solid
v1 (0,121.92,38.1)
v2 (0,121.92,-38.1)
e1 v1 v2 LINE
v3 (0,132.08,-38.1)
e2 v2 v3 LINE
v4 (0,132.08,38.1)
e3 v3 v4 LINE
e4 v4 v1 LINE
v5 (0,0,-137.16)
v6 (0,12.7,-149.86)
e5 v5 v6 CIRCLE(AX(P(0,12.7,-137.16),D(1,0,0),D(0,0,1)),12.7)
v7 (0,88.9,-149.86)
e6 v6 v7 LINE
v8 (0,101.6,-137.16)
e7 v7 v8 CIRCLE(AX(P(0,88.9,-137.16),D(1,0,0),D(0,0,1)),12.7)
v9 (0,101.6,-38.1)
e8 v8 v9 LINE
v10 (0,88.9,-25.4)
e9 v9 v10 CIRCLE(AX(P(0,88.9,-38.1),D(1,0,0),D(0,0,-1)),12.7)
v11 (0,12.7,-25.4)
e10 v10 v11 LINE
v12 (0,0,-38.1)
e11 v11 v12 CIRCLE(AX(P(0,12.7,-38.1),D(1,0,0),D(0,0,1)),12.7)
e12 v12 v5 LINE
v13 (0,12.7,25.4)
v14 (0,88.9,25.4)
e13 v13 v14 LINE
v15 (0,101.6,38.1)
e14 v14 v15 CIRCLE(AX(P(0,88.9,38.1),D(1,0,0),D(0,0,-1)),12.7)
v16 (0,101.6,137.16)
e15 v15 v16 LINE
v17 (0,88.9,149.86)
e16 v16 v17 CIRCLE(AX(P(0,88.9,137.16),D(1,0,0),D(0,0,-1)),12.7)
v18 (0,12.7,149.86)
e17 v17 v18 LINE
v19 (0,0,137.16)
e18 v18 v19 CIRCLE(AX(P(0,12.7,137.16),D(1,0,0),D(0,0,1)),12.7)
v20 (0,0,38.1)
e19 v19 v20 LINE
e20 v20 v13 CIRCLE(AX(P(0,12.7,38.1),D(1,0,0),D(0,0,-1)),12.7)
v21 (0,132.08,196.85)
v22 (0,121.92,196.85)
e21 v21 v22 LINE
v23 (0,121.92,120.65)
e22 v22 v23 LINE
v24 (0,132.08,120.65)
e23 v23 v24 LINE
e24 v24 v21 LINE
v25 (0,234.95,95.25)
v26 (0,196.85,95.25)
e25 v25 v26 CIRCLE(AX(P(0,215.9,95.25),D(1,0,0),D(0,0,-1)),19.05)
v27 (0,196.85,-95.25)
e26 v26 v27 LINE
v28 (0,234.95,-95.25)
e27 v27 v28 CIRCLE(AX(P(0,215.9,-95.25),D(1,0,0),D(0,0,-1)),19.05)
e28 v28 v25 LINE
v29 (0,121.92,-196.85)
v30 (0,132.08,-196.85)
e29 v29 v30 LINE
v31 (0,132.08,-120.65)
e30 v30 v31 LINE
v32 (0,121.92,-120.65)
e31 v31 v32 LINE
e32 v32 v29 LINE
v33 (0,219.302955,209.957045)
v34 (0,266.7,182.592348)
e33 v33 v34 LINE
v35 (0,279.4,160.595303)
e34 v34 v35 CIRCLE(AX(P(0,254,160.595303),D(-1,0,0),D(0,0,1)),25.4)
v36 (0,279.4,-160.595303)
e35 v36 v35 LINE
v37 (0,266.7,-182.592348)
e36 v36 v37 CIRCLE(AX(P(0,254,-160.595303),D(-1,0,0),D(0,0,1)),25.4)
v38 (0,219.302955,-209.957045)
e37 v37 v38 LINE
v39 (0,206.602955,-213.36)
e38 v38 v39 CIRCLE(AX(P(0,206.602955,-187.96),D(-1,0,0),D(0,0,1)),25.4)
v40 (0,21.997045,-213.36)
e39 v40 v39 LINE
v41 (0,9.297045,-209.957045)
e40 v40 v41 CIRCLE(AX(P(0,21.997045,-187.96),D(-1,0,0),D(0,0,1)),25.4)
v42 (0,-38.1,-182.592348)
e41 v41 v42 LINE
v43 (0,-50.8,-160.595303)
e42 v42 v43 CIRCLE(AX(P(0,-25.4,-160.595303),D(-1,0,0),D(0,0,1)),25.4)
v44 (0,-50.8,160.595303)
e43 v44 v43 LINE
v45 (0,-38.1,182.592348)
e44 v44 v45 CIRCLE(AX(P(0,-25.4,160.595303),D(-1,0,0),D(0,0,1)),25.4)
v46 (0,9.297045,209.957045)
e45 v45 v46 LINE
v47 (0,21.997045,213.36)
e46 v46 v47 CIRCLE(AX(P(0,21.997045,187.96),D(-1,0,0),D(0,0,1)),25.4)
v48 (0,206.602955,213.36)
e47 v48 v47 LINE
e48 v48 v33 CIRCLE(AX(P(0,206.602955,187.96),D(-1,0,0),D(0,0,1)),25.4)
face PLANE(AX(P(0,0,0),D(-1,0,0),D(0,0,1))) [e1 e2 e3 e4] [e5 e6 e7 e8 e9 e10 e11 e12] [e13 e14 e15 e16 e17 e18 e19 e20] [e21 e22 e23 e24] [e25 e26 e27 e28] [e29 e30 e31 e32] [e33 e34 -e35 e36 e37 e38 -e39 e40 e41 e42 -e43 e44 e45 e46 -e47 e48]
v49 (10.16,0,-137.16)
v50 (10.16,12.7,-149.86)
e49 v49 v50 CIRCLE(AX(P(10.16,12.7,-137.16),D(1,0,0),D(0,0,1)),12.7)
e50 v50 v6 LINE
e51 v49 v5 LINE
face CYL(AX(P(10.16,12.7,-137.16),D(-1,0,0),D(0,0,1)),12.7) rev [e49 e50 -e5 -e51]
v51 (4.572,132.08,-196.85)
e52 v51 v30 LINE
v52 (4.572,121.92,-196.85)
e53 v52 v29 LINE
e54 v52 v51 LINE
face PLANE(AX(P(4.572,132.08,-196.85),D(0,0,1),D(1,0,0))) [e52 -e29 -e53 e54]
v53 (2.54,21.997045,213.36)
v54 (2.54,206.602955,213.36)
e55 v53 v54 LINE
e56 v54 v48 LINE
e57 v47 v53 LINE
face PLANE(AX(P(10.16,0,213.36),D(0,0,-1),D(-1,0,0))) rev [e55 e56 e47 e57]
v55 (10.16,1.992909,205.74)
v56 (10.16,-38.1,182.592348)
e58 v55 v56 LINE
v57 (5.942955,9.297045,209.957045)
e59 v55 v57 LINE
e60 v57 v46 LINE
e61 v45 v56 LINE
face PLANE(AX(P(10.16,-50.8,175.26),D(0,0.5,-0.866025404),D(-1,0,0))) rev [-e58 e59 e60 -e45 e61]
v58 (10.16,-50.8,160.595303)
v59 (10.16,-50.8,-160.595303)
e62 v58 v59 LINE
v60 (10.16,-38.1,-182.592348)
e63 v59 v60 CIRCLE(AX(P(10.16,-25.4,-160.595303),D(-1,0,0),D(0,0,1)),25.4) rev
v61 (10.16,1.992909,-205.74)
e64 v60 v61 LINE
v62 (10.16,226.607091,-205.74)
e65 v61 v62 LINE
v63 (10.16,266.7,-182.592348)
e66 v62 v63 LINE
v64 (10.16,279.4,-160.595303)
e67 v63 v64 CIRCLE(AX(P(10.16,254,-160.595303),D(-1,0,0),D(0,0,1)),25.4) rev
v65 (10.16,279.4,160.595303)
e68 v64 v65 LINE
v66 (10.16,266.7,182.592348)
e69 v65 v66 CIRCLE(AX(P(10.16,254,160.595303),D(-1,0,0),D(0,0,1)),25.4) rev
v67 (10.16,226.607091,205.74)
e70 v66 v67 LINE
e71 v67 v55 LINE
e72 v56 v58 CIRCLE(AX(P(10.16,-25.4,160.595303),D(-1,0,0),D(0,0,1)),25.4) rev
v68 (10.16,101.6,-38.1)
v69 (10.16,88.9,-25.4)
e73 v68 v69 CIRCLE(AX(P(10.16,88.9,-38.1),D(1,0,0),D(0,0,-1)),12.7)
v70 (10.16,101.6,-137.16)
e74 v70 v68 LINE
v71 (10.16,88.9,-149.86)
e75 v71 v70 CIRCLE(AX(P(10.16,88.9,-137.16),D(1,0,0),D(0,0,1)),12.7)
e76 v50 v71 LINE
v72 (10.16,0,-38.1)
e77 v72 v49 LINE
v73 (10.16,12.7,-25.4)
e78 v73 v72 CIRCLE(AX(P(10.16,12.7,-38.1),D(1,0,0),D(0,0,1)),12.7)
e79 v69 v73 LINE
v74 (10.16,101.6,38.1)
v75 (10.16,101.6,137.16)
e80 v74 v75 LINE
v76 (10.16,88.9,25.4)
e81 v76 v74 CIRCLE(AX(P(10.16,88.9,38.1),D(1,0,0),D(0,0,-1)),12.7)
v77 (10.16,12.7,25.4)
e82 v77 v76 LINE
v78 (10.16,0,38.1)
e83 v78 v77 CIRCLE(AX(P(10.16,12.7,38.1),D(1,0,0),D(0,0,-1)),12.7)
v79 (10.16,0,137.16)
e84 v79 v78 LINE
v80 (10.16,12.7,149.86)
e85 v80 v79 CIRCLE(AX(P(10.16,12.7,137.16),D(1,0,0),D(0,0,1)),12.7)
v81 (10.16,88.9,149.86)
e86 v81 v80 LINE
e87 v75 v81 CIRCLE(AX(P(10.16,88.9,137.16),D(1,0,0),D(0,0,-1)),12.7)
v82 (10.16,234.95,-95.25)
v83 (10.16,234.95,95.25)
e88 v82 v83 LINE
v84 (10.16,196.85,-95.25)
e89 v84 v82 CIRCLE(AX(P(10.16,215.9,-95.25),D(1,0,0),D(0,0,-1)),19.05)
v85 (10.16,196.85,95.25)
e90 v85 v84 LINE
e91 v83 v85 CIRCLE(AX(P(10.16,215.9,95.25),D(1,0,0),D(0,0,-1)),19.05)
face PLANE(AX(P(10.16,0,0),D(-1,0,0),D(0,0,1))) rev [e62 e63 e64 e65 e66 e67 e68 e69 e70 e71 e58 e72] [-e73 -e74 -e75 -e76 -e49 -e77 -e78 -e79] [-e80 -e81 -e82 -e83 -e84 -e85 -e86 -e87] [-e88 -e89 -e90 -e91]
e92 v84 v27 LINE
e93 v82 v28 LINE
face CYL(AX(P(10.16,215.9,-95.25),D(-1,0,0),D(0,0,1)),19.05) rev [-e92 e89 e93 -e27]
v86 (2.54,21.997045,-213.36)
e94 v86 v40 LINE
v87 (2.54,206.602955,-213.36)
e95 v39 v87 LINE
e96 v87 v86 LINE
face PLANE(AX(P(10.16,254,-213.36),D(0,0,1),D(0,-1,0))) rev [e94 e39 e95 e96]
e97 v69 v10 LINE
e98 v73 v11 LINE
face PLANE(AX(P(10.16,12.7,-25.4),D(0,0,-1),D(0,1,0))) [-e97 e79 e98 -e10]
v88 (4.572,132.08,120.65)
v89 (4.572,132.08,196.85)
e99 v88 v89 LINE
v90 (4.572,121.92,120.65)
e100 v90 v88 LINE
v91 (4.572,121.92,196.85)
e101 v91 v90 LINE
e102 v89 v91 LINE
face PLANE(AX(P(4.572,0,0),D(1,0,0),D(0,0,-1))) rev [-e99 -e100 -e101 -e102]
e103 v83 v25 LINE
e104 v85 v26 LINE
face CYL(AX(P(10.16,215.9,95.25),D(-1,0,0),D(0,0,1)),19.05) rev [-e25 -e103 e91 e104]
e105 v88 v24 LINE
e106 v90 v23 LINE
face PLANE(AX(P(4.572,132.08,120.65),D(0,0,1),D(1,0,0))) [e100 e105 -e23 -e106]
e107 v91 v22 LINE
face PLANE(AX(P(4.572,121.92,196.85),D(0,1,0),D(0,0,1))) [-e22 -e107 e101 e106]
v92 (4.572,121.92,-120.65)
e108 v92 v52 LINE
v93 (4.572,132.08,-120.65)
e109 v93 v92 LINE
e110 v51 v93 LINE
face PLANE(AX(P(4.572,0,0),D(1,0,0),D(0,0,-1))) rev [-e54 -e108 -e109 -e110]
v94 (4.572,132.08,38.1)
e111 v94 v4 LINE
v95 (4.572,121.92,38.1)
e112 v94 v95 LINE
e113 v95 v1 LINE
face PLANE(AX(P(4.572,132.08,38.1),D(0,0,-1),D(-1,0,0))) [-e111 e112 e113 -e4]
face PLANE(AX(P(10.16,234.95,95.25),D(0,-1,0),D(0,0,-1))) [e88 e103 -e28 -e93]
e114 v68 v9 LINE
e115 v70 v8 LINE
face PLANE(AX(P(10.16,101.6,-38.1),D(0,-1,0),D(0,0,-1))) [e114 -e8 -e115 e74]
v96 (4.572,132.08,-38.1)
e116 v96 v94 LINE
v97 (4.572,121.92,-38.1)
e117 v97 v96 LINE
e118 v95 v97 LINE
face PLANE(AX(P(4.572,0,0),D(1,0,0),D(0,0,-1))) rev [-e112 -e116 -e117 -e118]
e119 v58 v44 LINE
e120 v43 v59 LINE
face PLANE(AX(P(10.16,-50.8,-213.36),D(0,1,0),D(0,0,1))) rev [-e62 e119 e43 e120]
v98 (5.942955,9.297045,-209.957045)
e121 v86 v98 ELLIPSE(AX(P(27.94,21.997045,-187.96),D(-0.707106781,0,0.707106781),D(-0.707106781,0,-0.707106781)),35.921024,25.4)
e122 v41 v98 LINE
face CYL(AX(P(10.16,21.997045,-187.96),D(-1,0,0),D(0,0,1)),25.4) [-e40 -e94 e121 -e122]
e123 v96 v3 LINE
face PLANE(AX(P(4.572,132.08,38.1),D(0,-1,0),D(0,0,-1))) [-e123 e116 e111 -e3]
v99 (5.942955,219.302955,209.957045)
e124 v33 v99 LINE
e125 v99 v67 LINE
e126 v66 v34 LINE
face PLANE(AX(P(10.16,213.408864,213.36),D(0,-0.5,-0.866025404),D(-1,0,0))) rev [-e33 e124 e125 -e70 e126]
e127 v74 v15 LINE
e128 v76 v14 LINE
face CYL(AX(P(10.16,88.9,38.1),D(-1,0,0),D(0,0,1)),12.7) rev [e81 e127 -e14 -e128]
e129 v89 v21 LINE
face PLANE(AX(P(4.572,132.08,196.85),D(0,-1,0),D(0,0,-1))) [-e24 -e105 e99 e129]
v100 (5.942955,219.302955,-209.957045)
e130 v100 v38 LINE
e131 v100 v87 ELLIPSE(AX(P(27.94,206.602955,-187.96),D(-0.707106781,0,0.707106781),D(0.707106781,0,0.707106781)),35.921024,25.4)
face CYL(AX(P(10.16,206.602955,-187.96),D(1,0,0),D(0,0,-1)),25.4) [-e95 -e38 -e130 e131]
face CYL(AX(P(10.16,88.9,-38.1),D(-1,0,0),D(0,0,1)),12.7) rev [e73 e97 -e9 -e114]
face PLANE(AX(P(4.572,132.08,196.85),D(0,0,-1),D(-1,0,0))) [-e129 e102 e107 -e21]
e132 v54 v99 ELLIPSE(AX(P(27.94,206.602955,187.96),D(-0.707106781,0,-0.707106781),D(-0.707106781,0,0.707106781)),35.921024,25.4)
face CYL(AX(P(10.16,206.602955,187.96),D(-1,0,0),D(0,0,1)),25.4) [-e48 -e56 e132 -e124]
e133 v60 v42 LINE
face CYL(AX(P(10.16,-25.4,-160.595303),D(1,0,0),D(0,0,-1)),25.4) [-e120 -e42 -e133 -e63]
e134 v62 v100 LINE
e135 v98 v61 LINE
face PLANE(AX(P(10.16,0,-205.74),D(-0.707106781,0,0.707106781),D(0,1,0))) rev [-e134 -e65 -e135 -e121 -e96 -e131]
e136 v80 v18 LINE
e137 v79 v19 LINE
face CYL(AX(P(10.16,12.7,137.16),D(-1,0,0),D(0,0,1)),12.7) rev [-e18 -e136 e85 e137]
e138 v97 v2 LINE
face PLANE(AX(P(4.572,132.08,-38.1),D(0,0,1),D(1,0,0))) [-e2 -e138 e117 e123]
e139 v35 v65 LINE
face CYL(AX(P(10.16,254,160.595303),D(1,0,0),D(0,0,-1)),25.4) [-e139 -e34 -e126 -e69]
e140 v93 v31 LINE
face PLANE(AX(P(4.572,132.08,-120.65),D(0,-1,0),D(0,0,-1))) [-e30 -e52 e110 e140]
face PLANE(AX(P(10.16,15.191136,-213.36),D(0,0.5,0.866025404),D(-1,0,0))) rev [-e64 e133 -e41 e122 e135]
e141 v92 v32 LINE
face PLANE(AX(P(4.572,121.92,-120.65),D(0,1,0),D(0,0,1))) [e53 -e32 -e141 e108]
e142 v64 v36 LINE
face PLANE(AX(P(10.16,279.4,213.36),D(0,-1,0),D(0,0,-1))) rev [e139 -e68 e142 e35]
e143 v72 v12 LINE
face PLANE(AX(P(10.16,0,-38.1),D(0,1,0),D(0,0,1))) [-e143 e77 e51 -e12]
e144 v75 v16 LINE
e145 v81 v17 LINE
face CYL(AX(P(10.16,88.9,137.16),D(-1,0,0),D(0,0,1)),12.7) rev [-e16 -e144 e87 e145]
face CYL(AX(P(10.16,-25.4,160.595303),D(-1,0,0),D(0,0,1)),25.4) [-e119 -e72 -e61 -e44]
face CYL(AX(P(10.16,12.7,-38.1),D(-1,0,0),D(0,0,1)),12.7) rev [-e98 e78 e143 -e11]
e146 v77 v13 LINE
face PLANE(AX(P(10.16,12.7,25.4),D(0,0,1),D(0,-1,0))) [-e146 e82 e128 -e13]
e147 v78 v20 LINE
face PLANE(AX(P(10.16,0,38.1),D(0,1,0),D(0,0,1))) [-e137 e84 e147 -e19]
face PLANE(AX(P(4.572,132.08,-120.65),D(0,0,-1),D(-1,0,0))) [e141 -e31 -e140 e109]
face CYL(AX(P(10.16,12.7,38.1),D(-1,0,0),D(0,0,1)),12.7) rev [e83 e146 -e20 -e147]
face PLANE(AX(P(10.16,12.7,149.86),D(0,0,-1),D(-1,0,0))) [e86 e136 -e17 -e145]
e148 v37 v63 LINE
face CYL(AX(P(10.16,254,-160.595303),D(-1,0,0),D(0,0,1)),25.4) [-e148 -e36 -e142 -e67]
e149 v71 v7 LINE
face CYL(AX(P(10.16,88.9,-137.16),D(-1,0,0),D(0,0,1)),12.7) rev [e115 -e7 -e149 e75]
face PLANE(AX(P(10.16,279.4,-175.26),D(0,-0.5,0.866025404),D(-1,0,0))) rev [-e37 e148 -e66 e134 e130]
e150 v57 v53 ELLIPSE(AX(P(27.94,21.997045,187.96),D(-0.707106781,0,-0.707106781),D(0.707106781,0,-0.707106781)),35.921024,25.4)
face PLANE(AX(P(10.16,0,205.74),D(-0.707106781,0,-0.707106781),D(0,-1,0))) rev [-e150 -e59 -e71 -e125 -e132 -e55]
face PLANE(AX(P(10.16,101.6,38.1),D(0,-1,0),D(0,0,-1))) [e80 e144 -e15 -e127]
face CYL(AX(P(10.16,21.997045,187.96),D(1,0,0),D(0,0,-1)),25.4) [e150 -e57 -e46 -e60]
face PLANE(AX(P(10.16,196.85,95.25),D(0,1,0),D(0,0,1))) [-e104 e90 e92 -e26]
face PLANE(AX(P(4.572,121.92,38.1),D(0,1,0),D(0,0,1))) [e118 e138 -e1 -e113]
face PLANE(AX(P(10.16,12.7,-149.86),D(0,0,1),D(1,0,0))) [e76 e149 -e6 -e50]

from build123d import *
from OCP.BRepFilletAPI import BRepFilletAPI_MakeChamfer

# Parameters (mm, degrees)
BOSS_EXTRUDE1_DEPTH = 10.16
SKETCH2_W           = 76.2
SKETCH2_H           = 10.16
CUT_EXTRUDE1_DEPTH  = 4.572
CHAMFER1_SIZE       = 38.1
CHAMFER1_SIZE2      = 65.991135768
FILLET1_R           = 25.4


with BuildPart() as part:
    # Sketch1 → Boss-Extrude1 (new body)
    with BuildSketch(Plane(origin=(0, 0, 0), x_dir=(0, 0, -1), z_dir=(1, 0, 0))):
        Polygon((-213.36, 0), (-213.36, 254), (-213.36, 279.4), (213.36, 279.4), (213.36, 254), (213.36, 0), (213.36, -50.8), (-213.36, -50.8), align=None)
        with BuildLine():
            Line((-95.25, 234.95), (95.25, 234.95))
            ThreePointArc((95.25, 234.95), (114.3, 215.9), (95.25, 196.85))
            Line((95.25, 196.85), (-95.25, 196.85))
            ThreePointArc((-95.25, 196.85), (-114.3, 215.9), (-95.25, 234.95))
        make_face(mode=Mode.SUBTRACT)
        with BuildLine():
            Line((38.1, 101.6), (137.16, 101.6))
            ThreePointArc((137.16, 101.6), (146.140256121, 97.880256121), (149.86, 88.9))
            Line((149.86, 88.9), (149.86, 12.7))
            ThreePointArc((149.86, 12.7), (146.140256121, 3.719743879), (137.16, 0))
            Line((137.16, 0), (38.1, 0))
            ThreePointArc((38.1, 0), (29.119743879, 3.719743879), (25.4, 12.7))
            Line((25.4, 12.7), (25.4, 88.9))
            ThreePointArc((25.4, 88.9), (29.119743879, 97.880256121), (38.1, 101.6))
        make_face(mode=Mode.SUBTRACT)
        with BuildLine():
            Line((-38.1, 0), (-137.16, 0))
            ThreePointArc((-137.16, 0), (-146.140256121, 3.719743879), (-149.86, 12.7))
            Line((-149.86, 12.7), (-149.86, 88.9))
            ThreePointArc((-149.86, 88.9), (-146.140256121, 97.880256121), (-137.16, 101.6))
            Line((-137.16, 101.6), (-38.1, 101.6))
            ThreePointArc((-38.1, 101.6), (-29.119743879, 97.880256121), (-25.4, 88.9))
            Line((-25.4, 88.9), (-25.4, 12.7))
            ThreePointArc((-25.4, 12.7), (-29.119743879, 3.719743879), (-38.1, 0))
        make_face(mode=Mode.SUBTRACT)
    extrude(amount=BOSS_EXTRUDE1_DEPTH)

    # Sketch2 → Cut-Extrude1 (cut)
    with BuildSketch(Plane(origin=(0, 0, 0), x_dir=(0, 0, -1), z_dir=(1, 0, 0))):
        with Locations((-158.75, 127)):
            Rectangle(SKETCH2_W, SKETCH2_H)
        with Locations((0, 127)):
            Rectangle(SKETCH2_W, SKETCH2_H)
        with Locations((158.75, 127)):
            Rectangle(SKETCH2_W, SKETCH2_H)
    extrude(amount=CUT_EXTRUDE1_DEPTH, mode=Mode.SUBTRACT)

    # Chamfer1: one chamfer whose edges measure the first distance from different faces: ONE call of the kernel's chamfer builder (chamfer() names one face for all edges)
    chamfer1_edges_1 = [part.edges().sort_by_distance(p)[0] for p in [
        (5.08, 279.4, 213.36),
        (5.08, 279.4, -213.36),
    ]]
    chamfer1_side_1 = [part.faces().sort_by_distance(p)[0] for p in [
        (5.08, 279.4, 0),
    ]]
    chamfer1_edges_2 = [part.edges().sort_by_distance(p)[0] for p in [
        (5.08, -50.8, -213.36),
        (5.08, -50.8, 213.36),
    ]]
    chamfer1_side_2 = [part.faces().sort_by_distance(p)[0] for p in [
        (5.08, -50.8, 0),
    ]]
    chamfer1 = BRepFilletAPI_MakeChamfer(part.part.solid().wrapped)
    for e in chamfer1_edges_1:
        chamfer1.Add(CHAMFER1_SIZE, CHAMFER1_SIZE2, e.wrapped, chamfer1_side_1[0].wrapped)  # the first distance lies on this face
    for e in chamfer1_edges_2:
        chamfer1.Add(CHAMFER1_SIZE, CHAMFER1_SIZE2, e.wrapped, chamfer1_side_2[0].wrapped)  # the first distance lies on this face
    add(Compound.cast(chamfer1.Shape()), mode=Mode.REPLACE)

    # Fillet1
    fillet1_edges = [part.edges().sort_by_distance(p)[0] for p in [
        (5.08, 15.191135768, 213.36),
        (5.08, 213.408864232, 213.36),
        (5.08, 279.4, -175.26),
        (5.08, 279.4, 175.26),
        (5.08, 15.191135768, -213.36),
        (5.08, 213.408864232, -213.36),
        (5.08, -50.8, -175.26),
        (5.08, -50.8, 175.26),
    ]]
    fillet(fillet1_edges, radius=FILLET1_R)

    # Chamfer2
    # the kernel refuses this chamfer: 7.62 mm, written as the material it takes off along each edge
    with BuildSketch(Plane(origin=(10.16, 253.633893228, -213.36), x_dir=(0.02749587661058636, 0, 0.9996219169112968), z_dir=(0, -1, 0))) as chamfer2_piece_1:
        with BuildLine():
            Line((7.838489747, 0), (-0.43088932, 7.826637587))
            Line((-0.43088932, 7.826637587), (-0.5832317, 7.822447215))
            ThreePointArc((-0.5832317, 7.822447215), (-0.26006471, 3.912091462), (-0.15234238, -0.004190372))
            Line((-0.15234238, -0.004190372), (0.004190372, -0.15234238))
            ThreePointArc((0.004190372, -0.15234238), (3.920472205, -0.04462005), (7.842680119, -0.15234238))
            Line((7.842680119, -0.15234238), (7.838489747, 0))
        make_face()
    extrude(amount=278.667786456, mode=Mode.SUBTRACT)
    with BuildSketch(Plane(origin=(10.16, -25.033893228, 213.36), x_dir=(-0.9996219169112968, 0, 0.027495876610586382), z_dir=(0, 1, 0))) as chamfer2_piece_2:
        with BuildLine():
            Line((7.838489747, 0), (-0.43088932, -7.826637587))
            Line((-0.43088932, -7.826637587), (-0.5832317, -7.822447215))
            ThreePointArc((-0.5832317, -7.822447215), (-0.26006471, -3.912091462), (-0.15234238, 0.004190372))
            Line((-0.15234238, 0.004190372), (0.004190372, 0.15234238))
            ThreePointArc((0.004190372, 0.15234238), (3.920472205, 0.04462005), (7.842680119, 0.15234238))
            Line((7.842680119, 0.15234238), (7.838489747, 0))
        make_face()
    extrude(amount=278.667786456, mode=Mode.SUBTRACT)


solid = part.part
